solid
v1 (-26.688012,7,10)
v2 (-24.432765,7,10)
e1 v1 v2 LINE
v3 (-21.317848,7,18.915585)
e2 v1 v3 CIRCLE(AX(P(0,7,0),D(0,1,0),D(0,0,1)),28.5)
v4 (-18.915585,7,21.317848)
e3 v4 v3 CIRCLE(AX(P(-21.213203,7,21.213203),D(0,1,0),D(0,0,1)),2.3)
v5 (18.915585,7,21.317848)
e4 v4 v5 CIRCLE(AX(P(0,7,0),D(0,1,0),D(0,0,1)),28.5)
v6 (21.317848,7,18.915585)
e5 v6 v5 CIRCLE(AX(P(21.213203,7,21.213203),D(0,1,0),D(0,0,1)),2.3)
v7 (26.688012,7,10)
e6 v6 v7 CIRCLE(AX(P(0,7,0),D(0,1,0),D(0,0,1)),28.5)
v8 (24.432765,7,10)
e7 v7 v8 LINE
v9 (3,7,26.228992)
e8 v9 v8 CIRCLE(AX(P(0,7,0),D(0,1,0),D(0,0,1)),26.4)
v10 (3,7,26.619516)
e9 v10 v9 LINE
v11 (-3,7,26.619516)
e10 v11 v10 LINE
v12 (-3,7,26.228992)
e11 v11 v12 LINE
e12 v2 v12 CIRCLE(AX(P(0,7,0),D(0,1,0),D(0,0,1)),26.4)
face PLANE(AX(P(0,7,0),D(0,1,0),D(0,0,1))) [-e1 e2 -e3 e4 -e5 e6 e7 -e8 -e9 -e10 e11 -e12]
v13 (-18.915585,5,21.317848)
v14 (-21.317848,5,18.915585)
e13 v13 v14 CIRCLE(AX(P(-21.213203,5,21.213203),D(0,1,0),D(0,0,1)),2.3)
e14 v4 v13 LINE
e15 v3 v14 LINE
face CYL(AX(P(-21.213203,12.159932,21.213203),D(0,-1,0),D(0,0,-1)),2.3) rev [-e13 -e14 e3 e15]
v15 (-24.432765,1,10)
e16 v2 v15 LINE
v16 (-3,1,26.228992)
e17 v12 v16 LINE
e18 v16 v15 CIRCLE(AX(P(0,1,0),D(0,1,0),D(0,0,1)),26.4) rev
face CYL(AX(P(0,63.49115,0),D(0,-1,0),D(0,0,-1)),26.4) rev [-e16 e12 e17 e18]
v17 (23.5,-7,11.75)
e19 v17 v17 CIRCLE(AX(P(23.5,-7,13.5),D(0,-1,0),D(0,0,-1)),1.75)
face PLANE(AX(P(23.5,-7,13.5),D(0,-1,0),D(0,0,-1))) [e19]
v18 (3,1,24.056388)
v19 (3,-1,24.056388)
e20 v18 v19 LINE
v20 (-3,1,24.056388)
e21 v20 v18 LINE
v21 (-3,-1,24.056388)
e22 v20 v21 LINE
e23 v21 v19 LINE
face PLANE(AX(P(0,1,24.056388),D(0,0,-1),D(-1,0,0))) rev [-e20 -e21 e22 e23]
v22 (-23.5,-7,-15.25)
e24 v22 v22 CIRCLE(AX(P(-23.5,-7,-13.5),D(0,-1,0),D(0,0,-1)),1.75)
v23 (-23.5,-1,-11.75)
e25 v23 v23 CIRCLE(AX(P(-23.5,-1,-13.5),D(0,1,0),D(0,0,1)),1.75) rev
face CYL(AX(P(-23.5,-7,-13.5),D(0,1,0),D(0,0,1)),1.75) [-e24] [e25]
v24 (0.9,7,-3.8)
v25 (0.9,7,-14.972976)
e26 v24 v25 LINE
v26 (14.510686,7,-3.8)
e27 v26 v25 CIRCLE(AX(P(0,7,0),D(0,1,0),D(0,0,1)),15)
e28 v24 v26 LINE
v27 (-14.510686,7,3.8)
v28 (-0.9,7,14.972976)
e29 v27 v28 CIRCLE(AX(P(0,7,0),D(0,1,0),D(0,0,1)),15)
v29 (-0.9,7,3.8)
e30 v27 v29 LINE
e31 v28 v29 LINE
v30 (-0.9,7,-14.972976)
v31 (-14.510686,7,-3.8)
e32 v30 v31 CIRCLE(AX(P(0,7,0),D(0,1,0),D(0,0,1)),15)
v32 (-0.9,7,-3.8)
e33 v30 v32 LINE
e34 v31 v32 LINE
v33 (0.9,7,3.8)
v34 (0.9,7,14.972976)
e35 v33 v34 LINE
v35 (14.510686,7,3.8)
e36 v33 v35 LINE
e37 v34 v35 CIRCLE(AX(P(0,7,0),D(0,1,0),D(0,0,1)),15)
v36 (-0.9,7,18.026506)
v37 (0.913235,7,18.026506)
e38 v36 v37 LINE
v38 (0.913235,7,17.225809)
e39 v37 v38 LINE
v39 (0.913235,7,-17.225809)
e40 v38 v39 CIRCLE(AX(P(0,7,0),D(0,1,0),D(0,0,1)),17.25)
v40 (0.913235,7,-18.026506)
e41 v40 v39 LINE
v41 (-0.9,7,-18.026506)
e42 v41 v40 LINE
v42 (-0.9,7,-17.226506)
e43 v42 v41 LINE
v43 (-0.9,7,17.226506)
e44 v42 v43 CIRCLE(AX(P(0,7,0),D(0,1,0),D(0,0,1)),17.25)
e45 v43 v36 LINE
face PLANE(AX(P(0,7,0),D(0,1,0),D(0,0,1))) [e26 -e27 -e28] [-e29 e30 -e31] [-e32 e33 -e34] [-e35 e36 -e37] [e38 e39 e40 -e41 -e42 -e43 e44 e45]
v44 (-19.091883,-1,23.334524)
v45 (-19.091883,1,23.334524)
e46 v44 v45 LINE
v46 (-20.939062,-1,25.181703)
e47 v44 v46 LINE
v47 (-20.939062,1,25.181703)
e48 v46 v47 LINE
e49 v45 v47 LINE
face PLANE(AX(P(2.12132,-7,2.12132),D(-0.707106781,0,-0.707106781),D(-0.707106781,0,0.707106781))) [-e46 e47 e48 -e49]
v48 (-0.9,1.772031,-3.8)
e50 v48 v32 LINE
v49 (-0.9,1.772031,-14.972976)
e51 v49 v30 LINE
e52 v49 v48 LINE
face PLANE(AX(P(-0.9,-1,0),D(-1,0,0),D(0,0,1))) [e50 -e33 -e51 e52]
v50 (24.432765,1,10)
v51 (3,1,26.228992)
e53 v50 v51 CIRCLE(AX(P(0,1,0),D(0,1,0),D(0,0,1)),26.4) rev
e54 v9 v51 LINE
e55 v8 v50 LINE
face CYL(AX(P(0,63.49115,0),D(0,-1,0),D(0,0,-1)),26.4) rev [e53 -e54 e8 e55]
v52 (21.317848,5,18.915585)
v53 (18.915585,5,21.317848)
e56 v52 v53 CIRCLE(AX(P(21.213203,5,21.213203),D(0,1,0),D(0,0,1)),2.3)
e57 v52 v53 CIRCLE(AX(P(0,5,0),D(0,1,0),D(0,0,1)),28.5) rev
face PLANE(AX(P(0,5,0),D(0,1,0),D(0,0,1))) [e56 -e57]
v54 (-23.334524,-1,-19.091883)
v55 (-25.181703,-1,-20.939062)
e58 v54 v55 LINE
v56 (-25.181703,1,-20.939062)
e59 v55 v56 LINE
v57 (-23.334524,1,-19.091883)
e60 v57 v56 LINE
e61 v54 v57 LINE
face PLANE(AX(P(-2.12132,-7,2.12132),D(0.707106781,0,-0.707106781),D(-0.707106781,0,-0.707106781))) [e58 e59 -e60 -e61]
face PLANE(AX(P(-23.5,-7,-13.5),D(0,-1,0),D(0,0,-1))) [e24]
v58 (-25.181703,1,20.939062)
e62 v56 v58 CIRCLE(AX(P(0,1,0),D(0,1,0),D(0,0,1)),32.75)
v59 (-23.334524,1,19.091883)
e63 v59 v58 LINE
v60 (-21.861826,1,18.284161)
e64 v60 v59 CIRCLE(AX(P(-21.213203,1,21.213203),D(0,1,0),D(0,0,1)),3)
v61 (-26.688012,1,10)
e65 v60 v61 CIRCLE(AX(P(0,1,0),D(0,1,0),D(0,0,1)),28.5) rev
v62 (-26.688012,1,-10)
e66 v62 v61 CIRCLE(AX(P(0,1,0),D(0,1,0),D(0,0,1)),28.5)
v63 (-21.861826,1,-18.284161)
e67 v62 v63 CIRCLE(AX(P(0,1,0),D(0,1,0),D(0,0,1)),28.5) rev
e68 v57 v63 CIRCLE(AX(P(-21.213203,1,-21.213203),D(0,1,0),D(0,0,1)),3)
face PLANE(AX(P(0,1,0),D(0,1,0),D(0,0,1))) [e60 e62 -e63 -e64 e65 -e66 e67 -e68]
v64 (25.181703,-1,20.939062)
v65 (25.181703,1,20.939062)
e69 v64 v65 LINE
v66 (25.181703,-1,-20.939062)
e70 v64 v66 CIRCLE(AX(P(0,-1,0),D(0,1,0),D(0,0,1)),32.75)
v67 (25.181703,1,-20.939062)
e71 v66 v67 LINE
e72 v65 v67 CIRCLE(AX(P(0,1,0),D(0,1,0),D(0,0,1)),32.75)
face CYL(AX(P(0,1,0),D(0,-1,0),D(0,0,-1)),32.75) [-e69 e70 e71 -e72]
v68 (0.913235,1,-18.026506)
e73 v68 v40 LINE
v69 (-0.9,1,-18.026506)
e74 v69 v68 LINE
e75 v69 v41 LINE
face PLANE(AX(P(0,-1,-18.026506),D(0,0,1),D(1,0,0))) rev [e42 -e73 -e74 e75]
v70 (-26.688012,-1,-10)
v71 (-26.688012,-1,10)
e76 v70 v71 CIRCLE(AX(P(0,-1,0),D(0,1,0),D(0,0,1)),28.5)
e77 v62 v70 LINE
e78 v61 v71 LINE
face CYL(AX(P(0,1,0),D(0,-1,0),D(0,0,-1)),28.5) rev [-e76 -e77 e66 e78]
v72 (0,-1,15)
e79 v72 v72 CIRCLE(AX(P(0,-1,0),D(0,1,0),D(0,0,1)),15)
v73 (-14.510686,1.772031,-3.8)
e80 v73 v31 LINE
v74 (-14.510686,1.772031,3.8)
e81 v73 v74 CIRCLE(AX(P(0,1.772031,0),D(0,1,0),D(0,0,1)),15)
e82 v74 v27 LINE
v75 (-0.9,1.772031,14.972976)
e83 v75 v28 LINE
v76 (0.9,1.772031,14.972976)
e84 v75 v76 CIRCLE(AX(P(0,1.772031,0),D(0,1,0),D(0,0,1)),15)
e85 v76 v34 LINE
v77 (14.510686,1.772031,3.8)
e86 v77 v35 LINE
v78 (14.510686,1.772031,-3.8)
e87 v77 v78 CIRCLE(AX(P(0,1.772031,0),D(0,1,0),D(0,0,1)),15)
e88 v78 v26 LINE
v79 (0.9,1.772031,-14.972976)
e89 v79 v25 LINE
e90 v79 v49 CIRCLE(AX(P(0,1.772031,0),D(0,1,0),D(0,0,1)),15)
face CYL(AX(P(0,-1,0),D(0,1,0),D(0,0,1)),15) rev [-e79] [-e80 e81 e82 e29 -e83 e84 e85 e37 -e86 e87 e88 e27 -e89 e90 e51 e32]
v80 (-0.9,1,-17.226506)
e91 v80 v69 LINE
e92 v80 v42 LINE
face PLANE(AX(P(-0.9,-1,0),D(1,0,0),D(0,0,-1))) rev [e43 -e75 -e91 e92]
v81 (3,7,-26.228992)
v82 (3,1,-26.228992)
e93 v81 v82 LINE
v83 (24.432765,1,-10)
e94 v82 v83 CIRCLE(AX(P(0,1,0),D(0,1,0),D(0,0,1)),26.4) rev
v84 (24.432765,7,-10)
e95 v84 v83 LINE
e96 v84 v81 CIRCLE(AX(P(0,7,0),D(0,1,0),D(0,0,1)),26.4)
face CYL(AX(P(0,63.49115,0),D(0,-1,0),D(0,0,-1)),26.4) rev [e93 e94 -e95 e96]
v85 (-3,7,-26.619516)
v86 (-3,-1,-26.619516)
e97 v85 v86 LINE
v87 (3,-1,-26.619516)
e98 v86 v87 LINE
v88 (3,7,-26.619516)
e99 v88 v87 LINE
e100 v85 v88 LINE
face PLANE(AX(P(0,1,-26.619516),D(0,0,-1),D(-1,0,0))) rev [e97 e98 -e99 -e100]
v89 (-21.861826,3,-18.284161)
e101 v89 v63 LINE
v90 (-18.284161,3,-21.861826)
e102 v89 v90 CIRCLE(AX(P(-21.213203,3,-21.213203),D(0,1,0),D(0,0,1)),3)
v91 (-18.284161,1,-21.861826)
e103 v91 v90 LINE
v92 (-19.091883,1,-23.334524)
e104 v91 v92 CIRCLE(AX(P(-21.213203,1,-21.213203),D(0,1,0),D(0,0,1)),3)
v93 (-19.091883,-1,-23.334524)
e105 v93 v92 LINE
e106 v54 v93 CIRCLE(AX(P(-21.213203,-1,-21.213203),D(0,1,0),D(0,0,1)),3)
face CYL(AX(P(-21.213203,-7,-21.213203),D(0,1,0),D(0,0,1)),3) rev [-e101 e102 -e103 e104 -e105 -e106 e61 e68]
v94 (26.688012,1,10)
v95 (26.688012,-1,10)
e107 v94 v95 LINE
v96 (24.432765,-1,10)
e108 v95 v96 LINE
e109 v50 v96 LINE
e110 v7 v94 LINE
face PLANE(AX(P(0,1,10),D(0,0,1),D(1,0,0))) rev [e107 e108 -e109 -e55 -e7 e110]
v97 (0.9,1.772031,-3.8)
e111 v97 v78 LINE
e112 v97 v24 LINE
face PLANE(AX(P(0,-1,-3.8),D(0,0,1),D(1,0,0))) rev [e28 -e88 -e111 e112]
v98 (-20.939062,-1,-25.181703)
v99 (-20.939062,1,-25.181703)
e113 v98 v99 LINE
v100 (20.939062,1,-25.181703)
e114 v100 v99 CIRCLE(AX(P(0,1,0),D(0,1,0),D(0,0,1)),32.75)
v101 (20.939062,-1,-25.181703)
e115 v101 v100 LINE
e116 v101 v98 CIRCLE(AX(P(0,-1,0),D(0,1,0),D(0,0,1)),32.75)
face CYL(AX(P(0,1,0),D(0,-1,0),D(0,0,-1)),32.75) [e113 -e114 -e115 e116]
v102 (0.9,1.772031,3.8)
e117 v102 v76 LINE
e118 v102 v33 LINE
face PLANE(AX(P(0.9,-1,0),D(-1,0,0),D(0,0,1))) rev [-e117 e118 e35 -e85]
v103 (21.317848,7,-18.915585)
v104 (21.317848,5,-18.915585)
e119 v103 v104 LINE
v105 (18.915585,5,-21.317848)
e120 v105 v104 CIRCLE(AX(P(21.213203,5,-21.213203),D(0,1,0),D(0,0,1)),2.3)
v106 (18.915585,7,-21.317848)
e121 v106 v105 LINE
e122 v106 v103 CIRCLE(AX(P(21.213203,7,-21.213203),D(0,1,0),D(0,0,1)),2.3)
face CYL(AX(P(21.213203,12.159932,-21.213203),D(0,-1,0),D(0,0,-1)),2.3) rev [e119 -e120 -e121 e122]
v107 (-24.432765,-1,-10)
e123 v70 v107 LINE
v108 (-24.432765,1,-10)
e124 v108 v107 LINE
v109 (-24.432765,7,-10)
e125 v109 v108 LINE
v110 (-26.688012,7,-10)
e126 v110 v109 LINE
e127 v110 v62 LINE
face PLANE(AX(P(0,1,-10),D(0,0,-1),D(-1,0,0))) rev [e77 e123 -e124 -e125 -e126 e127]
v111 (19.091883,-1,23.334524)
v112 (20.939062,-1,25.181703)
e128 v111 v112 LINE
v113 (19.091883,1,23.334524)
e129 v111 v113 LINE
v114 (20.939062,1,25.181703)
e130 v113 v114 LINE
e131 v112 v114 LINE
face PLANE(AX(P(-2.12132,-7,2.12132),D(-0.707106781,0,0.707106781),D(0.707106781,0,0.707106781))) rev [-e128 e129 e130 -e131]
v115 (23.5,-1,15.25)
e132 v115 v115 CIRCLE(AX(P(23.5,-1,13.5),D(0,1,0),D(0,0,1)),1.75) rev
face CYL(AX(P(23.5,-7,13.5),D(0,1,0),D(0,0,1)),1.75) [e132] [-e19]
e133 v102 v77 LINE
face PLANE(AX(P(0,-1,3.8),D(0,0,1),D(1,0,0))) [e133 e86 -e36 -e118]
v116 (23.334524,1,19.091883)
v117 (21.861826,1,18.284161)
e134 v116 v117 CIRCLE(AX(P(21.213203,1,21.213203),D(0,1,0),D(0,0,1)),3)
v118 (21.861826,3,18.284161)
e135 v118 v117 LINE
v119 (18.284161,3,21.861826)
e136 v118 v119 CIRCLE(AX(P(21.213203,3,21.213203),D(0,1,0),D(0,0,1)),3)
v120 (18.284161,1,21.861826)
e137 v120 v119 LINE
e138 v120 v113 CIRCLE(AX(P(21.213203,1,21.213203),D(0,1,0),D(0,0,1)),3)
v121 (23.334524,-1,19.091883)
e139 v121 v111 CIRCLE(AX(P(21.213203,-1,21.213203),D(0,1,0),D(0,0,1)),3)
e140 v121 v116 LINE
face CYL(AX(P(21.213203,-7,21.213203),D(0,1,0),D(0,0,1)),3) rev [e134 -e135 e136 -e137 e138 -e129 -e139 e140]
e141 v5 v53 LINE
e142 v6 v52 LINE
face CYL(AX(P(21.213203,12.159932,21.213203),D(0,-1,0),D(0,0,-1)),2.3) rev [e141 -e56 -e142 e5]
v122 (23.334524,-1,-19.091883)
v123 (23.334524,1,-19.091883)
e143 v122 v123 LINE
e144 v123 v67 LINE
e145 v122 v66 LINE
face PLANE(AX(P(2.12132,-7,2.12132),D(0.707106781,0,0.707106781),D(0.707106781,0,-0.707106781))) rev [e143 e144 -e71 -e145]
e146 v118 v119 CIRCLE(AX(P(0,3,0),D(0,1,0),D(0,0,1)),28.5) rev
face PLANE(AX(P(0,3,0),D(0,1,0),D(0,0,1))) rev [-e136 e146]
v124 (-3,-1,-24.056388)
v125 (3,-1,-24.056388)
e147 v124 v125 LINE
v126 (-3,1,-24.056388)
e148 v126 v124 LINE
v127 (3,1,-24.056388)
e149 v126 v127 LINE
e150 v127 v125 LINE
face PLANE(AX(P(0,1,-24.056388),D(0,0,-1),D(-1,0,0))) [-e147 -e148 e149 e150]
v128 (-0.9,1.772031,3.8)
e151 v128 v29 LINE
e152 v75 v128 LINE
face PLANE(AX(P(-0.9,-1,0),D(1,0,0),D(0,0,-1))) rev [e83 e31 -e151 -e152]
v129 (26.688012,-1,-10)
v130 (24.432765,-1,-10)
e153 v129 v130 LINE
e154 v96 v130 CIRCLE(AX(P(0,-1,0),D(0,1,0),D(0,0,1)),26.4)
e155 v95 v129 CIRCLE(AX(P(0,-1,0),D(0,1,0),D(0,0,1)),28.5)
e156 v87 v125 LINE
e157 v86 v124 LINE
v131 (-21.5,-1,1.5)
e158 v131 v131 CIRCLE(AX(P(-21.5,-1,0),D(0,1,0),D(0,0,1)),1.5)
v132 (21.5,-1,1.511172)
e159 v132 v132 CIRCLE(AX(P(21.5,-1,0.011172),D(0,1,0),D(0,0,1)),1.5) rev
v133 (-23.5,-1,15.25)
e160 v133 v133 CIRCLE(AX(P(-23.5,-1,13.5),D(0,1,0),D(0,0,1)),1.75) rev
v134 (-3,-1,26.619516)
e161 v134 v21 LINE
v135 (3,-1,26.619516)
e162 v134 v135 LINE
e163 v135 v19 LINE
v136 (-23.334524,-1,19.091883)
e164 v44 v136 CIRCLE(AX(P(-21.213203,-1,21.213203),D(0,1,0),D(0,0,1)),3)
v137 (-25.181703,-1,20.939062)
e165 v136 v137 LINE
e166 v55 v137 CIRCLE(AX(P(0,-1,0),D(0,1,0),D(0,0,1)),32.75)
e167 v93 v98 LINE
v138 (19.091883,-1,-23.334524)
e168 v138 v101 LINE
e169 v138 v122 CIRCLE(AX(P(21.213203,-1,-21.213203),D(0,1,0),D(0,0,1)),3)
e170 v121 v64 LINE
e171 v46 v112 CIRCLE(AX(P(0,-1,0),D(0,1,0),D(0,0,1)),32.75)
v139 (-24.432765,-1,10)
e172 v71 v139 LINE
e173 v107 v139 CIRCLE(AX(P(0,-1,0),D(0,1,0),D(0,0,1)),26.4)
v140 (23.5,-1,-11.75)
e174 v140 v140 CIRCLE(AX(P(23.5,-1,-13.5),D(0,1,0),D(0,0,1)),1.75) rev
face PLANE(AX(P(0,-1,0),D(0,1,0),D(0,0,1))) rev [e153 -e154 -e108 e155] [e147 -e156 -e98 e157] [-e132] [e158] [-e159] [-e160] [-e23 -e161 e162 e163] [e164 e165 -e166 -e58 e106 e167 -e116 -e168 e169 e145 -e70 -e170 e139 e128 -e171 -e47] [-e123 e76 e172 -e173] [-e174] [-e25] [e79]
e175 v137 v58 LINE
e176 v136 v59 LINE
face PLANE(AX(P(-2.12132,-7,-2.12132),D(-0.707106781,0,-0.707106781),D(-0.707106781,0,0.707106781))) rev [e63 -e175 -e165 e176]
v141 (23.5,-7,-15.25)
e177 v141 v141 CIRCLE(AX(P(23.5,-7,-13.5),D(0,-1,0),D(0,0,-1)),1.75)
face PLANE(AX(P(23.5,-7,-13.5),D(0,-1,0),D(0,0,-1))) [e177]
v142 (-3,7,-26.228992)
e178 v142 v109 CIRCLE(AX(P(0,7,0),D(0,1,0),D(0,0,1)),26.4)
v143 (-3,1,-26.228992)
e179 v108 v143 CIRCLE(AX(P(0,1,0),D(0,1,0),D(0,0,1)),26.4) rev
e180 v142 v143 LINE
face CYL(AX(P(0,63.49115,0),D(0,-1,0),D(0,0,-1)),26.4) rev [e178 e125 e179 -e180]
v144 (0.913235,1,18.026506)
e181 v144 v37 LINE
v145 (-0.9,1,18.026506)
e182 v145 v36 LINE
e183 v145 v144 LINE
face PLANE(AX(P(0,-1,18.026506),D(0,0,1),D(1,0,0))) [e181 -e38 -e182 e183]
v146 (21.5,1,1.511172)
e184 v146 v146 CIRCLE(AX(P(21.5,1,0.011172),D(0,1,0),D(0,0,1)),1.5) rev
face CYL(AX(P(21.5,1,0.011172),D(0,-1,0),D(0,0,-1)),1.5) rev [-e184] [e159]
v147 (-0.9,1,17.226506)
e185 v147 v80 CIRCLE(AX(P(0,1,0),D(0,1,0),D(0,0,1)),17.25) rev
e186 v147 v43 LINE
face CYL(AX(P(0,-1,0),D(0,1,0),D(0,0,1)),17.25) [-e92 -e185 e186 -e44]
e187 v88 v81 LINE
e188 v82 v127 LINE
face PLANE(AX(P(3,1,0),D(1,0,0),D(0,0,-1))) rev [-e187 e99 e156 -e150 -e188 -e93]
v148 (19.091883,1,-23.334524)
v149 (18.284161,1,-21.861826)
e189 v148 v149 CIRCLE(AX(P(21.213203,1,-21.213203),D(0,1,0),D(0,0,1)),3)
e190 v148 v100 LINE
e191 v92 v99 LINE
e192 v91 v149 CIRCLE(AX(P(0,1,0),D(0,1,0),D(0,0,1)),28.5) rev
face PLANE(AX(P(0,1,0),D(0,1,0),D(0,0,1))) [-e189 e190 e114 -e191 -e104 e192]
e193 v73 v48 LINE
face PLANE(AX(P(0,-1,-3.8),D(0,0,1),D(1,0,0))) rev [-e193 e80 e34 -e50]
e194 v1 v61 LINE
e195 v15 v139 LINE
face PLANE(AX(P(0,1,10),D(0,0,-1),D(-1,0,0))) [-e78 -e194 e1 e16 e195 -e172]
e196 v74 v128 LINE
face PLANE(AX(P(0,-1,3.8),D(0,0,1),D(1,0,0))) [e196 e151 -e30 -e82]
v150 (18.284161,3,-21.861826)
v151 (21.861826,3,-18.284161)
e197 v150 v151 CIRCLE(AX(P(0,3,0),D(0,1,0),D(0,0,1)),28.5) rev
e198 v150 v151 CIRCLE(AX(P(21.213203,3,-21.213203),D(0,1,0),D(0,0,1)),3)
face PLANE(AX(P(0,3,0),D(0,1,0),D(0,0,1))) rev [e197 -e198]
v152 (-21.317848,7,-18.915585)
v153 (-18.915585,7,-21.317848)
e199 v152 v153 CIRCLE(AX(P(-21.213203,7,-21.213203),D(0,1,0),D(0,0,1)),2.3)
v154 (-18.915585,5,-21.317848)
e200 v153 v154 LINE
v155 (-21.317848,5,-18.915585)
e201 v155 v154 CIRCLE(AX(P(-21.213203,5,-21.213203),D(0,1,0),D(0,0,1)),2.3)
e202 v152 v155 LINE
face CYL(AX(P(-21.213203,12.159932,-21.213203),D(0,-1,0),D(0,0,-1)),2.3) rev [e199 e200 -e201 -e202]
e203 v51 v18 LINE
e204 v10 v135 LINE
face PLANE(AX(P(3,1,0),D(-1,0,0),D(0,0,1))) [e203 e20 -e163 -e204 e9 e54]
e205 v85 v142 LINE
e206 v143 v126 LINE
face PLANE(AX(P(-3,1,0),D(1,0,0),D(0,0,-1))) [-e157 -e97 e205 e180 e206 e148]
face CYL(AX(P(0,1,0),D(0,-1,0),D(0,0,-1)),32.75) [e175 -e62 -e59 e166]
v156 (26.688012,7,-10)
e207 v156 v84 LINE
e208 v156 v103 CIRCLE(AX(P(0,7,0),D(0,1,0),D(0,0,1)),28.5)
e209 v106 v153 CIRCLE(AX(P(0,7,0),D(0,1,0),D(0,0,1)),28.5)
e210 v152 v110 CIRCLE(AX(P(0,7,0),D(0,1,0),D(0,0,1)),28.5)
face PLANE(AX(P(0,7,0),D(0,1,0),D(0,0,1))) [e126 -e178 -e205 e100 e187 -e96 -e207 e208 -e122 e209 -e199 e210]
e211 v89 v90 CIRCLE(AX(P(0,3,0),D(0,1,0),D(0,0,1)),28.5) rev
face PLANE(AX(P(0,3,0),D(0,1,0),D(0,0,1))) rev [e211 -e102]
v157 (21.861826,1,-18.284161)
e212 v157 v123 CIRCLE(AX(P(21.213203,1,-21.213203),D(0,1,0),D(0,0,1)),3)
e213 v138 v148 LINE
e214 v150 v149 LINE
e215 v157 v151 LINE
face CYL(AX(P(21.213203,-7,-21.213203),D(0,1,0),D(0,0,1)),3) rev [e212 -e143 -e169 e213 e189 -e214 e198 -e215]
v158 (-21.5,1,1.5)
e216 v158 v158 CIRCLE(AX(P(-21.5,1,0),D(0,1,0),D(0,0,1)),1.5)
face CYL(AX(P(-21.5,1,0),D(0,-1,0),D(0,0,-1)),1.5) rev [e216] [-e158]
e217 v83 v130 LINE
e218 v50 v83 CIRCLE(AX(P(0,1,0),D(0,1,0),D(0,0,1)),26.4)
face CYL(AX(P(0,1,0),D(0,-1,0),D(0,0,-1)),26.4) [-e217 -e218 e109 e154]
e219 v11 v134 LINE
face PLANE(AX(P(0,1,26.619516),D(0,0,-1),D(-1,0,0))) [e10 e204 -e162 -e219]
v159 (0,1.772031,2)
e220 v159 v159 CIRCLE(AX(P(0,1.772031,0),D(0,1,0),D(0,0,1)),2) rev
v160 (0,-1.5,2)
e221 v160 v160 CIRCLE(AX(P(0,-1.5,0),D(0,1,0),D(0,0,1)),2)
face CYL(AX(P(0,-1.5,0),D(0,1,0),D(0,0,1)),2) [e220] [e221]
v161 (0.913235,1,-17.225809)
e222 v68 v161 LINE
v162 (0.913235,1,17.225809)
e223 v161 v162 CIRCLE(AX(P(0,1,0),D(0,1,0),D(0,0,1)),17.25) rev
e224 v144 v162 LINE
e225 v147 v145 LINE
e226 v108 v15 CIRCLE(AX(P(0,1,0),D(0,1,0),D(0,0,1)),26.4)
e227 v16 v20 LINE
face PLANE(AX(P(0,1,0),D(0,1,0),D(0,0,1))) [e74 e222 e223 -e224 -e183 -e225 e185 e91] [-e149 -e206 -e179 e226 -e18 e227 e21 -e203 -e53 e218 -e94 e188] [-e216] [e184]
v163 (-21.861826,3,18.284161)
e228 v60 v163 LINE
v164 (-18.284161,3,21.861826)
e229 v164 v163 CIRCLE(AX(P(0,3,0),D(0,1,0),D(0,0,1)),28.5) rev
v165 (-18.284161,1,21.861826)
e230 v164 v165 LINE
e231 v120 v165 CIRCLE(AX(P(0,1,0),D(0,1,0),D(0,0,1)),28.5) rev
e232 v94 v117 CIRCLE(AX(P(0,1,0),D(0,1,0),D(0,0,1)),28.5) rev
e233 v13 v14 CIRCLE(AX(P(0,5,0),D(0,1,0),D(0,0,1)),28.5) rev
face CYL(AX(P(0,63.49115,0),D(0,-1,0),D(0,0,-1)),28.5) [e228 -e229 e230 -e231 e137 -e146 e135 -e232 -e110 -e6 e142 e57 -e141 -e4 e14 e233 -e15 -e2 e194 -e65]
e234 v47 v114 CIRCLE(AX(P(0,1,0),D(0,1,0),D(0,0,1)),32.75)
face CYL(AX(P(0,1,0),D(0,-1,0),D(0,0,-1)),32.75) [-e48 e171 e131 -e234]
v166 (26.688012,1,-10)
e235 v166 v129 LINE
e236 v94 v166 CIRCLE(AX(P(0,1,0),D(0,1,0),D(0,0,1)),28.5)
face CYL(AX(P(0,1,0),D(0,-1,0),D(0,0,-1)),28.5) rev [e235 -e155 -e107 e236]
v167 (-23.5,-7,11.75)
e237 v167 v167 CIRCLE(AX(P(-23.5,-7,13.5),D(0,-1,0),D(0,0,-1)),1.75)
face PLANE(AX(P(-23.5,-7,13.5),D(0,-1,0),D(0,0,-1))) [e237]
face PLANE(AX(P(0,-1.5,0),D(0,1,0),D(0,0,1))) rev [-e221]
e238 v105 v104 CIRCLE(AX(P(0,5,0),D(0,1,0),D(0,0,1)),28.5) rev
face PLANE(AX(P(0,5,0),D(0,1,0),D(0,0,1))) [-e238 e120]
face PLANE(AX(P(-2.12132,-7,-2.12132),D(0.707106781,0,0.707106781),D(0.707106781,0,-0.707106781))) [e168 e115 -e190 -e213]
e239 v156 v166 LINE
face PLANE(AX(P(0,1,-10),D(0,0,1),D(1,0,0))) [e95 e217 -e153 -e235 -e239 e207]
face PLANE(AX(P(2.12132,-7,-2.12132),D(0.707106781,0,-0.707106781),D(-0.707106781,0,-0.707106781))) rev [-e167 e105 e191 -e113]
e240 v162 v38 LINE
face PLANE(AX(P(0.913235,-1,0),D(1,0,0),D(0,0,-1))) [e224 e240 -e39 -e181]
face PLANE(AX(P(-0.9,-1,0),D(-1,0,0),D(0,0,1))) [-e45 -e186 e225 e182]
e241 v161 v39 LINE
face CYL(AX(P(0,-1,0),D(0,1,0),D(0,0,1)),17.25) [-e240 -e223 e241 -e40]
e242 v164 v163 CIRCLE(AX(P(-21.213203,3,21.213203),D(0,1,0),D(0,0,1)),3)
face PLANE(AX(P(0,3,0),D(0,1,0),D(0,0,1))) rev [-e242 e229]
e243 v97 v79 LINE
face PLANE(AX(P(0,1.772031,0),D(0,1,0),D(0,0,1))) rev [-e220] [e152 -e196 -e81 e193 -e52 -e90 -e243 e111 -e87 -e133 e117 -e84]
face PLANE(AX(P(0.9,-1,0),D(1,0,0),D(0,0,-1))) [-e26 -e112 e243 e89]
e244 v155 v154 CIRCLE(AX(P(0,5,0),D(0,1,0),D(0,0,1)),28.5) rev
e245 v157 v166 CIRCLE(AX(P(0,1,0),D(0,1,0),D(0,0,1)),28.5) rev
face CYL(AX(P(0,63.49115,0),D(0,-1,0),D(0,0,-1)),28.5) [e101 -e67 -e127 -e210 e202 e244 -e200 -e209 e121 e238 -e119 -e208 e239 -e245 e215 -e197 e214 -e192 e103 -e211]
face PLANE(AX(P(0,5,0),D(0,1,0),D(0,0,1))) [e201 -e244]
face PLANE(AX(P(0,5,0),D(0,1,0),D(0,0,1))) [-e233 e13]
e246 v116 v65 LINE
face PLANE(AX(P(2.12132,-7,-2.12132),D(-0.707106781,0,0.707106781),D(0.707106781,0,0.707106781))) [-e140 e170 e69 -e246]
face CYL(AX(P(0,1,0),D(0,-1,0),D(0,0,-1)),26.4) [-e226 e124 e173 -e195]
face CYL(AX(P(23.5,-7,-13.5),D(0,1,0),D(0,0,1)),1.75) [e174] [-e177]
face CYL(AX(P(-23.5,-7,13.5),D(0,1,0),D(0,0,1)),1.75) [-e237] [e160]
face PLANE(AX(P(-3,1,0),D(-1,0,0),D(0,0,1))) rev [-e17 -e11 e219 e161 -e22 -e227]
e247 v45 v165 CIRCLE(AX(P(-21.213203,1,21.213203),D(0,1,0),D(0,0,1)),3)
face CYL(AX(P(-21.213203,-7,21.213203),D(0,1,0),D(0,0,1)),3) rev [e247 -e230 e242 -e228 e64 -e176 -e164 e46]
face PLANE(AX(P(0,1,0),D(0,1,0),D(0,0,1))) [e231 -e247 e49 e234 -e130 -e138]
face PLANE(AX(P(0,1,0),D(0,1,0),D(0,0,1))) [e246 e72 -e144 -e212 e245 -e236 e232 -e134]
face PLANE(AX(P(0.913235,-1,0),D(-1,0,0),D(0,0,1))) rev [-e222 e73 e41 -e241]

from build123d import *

# Parameters (mm, degrees)
CENTER_SPOKE_EXTRUDE_DEPTH      = 7
CENTER_SPOKE_EXTRUDE_DEPTH_BACK = 1
SKETCH1_R                       = 17.25
SKETCH1_R_2                     = 15
BASE_DEPTH                      = 1
BASE_DEPTH_BACK                 = 1
SKETCH1_4_R                     = 32.75
SKETCH1_4_W                     = 6
SKETCH1_4_H                     = 2.563127927
SKETCH1_4_R_2                   = 1.5
SKETCH3_R                       = 1.75
SPRING_FEET_DEPTH               = 6
CUT_EXTRUDE1_DEPTH              = 1.772030918
CUT_EXTRUDE1_DEPTH_BACK         = 2
SKETCH1_8_R                     = 2
BOSS_EXTRUDE3_START             = -1.5
SKETCH1_11_R                    = 2
BOSS_EXTRUDE3_DEPTH             = 8.5
BOSS_EXTRUDE4_DEPTH             = 7
CUT_EXTRUDE3_DEPTH              = 48.001329768
CUT_EXTRUDE3_DEPTH_BACK         = 48.001329768
BOSS_EXTRUDE5_START             = 2
BOSS_EXTRUDE5_DEPTH             = 4
BOSS_EXTRUDE6_START             = 2
BOSS_EXTRUDE6_DEPTH             = 2


# Read off the part's stored shape, not the designer's step: Boss-Extrude5
with BuildPart() as part:
    # Sketch1 → Center Spoke Extrude (new, two sides: drawn at the far end of the back side and taken through both)
    # profile 1 of 9: a face of its own
    with BuildSketch(Plane(origin=(0, 0, 0), x_dir=(1, 0, 0), z_dir=(0, 1, 0)).offset(-CENTER_SPOKE_EXTRUDE_DEPTH_BACK)):
        Circle(SKETCH1_R)
        Circle(SKETCH1_R_2, mode=Mode.SUBTRACT)
    # profile 2 of 9: a face of its own
    with BuildSketch(Plane(origin=(0, 0, 0), x_dir=(1, 0, 0), z_dir=(0, 1, 0)).offset(-CENTER_SPOKE_EXTRUDE_DEPTH_BACK)):
        with BuildLine():
            Line((-0.9, 14.972975656), (-0.9, 3.8))
            Line((-0.9, 3.8), (0.9, 3.8))
            Line((0.9, 3.8), (0.9, 14.972975656))
            ThreePointArc((0.9, 14.972975656), (0, 15), (-0.9, 14.972975656))
        make_face()
    # profile 3 of 9: a face of its own
    with BuildSketch(Plane(origin=(0, 0, 0), x_dir=(1, 0, 0), z_dir=(0, 1, 0)).offset(-CENTER_SPOKE_EXTRUDE_DEPTH_BACK)):
        with BuildLine():
            Line((0.9, 3.8), (-0.9, 3.8))
            Line((-0.9, 3.8), (-0.9, 1.78605711))
            ThreePointArc((-0.9, 1.78605711), (0, 2), (0.9, 1.78605711))
            Line((0.9, 1.78605711), (0.9, 3.8))
        make_face()
    # profile 4 of 9: a face of its own
    with BuildSketch(Plane(origin=(0, 0, 0), x_dir=(1, 0, 0), z_dir=(0, 1, 0)).offset(-CENTER_SPOKE_EXTRUDE_DEPTH_BACK)):
        with BuildLine():
            Line((-0.9, -1.78605711), (-0.9, -3.8))
            Line((-0.9, -3.8), (0.9, -3.8))
            Line((0.9, -3.8), (0.9, -1.78605711))
            ThreePointArc((0.9, -1.78605711), (0, -2), (-0.9, -1.78605711))
        make_face()
    # profile 5 of 9: a face of its own
    with BuildSketch(Plane(origin=(0, 0, 0), x_dir=(1, 0, 0), z_dir=(0, 1, 0)).offset(-CENTER_SPOKE_EXTRUDE_DEPTH_BACK)):
        with BuildLine():
            Line((0.9, -3.8), (-0.9, -3.8))
            Line((-0.9, -3.8), (-0.9, -14.972975656))
            ThreePointArc((-0.9, -14.972975656), (0, -15), (0.9, -14.972975656))
            Line((0.9, -14.972975656), (0.9, -3.8))
        make_face()
    # profile 6 of 9: a face of its own
    with BuildSketch(Plane(origin=(0, 0, 0), x_dir=(1, 0, 0), z_dir=(0, 1, 0)).offset(-CENTER_SPOKE_EXTRUDE_DEPTH_BACK)):
        with BuildLine():
            Line((14.510685718, 3.8), (0.9, 3.8))
            Line((0.9, 3.8), (0.9, 1.78605711))
            ThreePointArc((0.9, 1.78605711), (1.702938637, 1.048808848), (2, 0))
            ThreePointArc((2, 0), (1.702938637, -1.048808848), (0.9, -1.78605711))
            Line((0.9, -1.78605711), (0.9, -3.8))
            Line((0.9, -3.8), (14.510685718, -3.8))
            ThreePointArc((14.510685718, -3.8), (14.87716851, -1.915687113), (15, 0))
            ThreePointArc((15, 0), (14.87716851, 1.915687113), (14.510685718, 3.8))
        make_face()
    # profile 7 of 9: a face of its own
    with BuildSketch(Plane(origin=(0, 0, 0), x_dir=(1, 0, 0), z_dir=(0, 1, 0)).offset(-CENTER_SPOKE_EXTRUDE_DEPTH_BACK)):
        with BuildLine():
            Line((-0.9, 3.8), (-14.510685718, 3.8))
            ThreePointArc((-14.510685718, 3.8), (-15, 0), (-14.510685718, -3.8))
            Line((-14.510685718, -3.8), (-0.9, -3.8))
            Line((-0.9, -3.8), (-0.9, -1.78605711))
            ThreePointArc((-0.9, -1.78605711), (-2, 0), (-0.9, 1.78605711))
            Line((-0.9, 1.78605711), (-0.9, 3.8))
        make_face()
    # profile 8 of 9: a face of its own
    with BuildSketch(Plane(origin=(0, 0, 0), x_dir=(1, 0, 0), z_dir=(0, 1, 0)).offset(-CENTER_SPOKE_EXTRUDE_DEPTH_BACK)):
        with BuildLine():
            ThreePointArc((0.913235294, -17.225809162), (0.006626806, -17.249998727), (-0.9, -17.22650574))
            Line((-0.9, -17.22650574), (-0.9, -18.02650574))
            Line((-0.9, -18.02650574), (0.913235294, -18.02650574))
            Line((0.913235294, -18.02650574), (0.913235294, -17.225809162))
        make_face()
    # profile 9 of 9: a face of its own
    with BuildSketch(Plane(origin=(0, 0, 0), x_dir=(1, 0, 0), z_dir=(0, 1, 0)).offset(-CENTER_SPOKE_EXTRUDE_DEPTH_BACK)):
        with BuildLine():
            Line((-0.9, 18.02650574), (-0.9, 17.22650574))
            ThreePointArc((-0.9, 17.22650574), (0.006626806, 17.249998727), (0.913235294, 17.225809162))
            Line((0.913235294, 17.225809162), (0.913235294, 18.02650574))
            Line((0.913235294, 18.02650574), (-0.9, 18.02650574))
        make_face()
    extrude(amount=CENTER_SPOKE_EXTRUDE_DEPTH + CENTER_SPOKE_EXTRUDE_DEPTH_BACK)

    # Sketch1<4> → base (add, two sides: drawn at the far end of the back side and taken through both)
    with BuildSketch(Plane(origin=(0, 0, 0), x_dir=(1, 0, 0), z_dir=(0, 1, 0)).offset(-BASE_DEPTH_BACK)):
        with Locations(Location((0, 0, 0), (0, 0, 270))):
            Circle(SKETCH1_4_R)
        with Locations((0, -25.337952307)):
            Rectangle(SKETCH1_4_W, SKETCH1_4_H, mode=Mode.SUBTRACT)
        with BuildLine():
            ThreePointArc((-26.68801229, -10), (-28.5, 0), (-26.68801229, 10))
            Line((-26.68801229, 10), (-24.432764887, 10))
            ThreePointArc((-24.432764887, 10), (-26.4, 0), (-24.432764887, -10))
            Line((-24.432764887, -10), (-26.68801229, -10))
        make_face(mode=Mode.SUBTRACT)
        with Locations(Location((21.5, -0.011171984, 0), (0, 0, 270))):
            Circle(SKETCH1_4_R_2, mode=Mode.SUBTRACT)
        with Locations(Location((-21.5, 0, 0), (0, 0, 270))):
            Circle(SKETCH1_4_R_2, mode=Mode.SUBTRACT)
        with Locations((0, 25.337952307)):
            Rectangle(SKETCH1_4_W, SKETCH1_4_H, mode=Mode.SUBTRACT)
        with BuildLine():
            ThreePointArc((-0.9, -17.22650574), (-17.25, 0), (-0.9, 17.22650574))
            Line((-0.9, 17.22650574), (-0.9, 18.02650574))
            Line((-0.9, 18.02650574), (0.913235294, 18.02650574))
            Line((0.913235294, 18.02650574), (0.913235294, 17.225809162))
            ThreePointArc((0.913235294, 17.225809162), (17.25, 0), (0.913235294, -17.225809162))
            Line((0.913235294, -17.225809162), (0.913235294, -18.02650574))
            Line((0.913235294, -18.02650574), (-0.9, -18.02650574))
            Line((-0.9, -18.02650574), (-0.9, -17.22650574))
        make_face(mode=Mode.SUBTRACT)
        with BuildLine():
            ThreePointArc((26.68801229, 10), (28.5, 0), (26.68801229, -10))
            Line((26.68801229, -10), (24.432764887, -10))
            ThreePointArc((24.432764887, -10), (26.4, 0), (24.432764887, 10))
            Line((24.432764887, 10), (26.68801229, 10))
        make_face(mode=Mode.SUBTRACT)
    extrude(amount=BASE_DEPTH + BASE_DEPTH_BACK)

    # Sketch3 → Spring feet (add)
    with BuildSketch(Plane.XZ.offset(1)):
        with Locations(Location((-23.5, 13.5, 0), (0, 0, 90))):
            Circle(SKETCH3_R)
        with Locations(Location((23.5, 13.5, 0), (0, 0, 90))):
            Circle(SKETCH3_R)
        with Locations(Location((23.5, -13.5, 0), (0, 0, 90))):
            Circle(SKETCH3_R)
        with Locations(Location((-23.5, -13.5, 0), (0, 0, 90))):
            Circle(SKETCH3_R)
    extrude(amount=SPRING_FEET_DEPTH)

    # Sketch1<8> → Cut-Extrude1 (cut, two sides: drawn at the far end of the back side and taken through both)
    with BuildSketch(Plane(origin=(0, 0, 0), x_dir=(1, 0, 0), z_dir=(0, 1, 0)).offset(-CUT_EXTRUDE1_DEPTH_BACK)):
        with BuildLine():
            Line((14.510685718, 3.8), (0.9, 3.8))
            Line((0.9, 3.8), (0.9, 1.78605711))
            ThreePointArc((0.9, 1.78605711), (1.702938637, 1.048808848), (2, 0))
            ThreePointArc((2, 0), (1.702938637, -1.048808848), (0.9, -1.78605711))
            Line((0.9, -1.78605711), (0.9, -3.8))
            Line((0.9, -3.8), (14.510685718, -3.8))
            ThreePointArc((14.510685718, -3.8), (14.87716851, -1.915687113), (15, 0))
            ThreePointArc((15, 0), (14.87716851, 1.915687113), (14.510685718, 3.8))
        make_face()
        with BuildLine():
            Line((-0.9, 3.8), (-14.510685718, 3.8))
            ThreePointArc((-14.510685718, 3.8), (-15, 0), (-14.510685718, -3.8))
            Line((-14.510685718, -3.8), (-0.9, -3.8))
            Line((-0.9, -3.8), (-0.9, -1.78605711))
            ThreePointArc((-0.9, -1.78605711), (-2, 0), (-0.9, 1.78605711))
            Line((-0.9, 1.78605711), (-0.9, 3.8))
        make_face()
        with BuildLine():
            Line((-0.9, 14.972975656), (-0.9, 3.8))
            Line((-0.9, 3.8), (0.9, 3.8))
            Line((0.9, 3.8), (0.9, 14.972975656))
            ThreePointArc((0.9, 14.972975656), (0, 15), (-0.9, 14.972975656))
        make_face()
        with BuildLine():
            Line((-0.9, -1.78605711), (-0.9, -3.8))
            Line((-0.9, -3.8), (0.9, -3.8))
            Line((0.9, -3.8), (0.9, -1.78605711))
            ThreePointArc((0.9, -1.78605711), (0, -2), (-0.9, -1.78605711))
        make_face()
        with BuildLine():
            Line((0.9, -3.8), (-0.9, -3.8))
            Line((-0.9, -3.8), (-0.9, -14.972975656))
            ThreePointArc((-0.9, -14.972975656), (0, -15), (0.9, -14.972975656))
            Line((0.9, -14.972975656), (0.9, -3.8))
        make_face()
        with Locations(Location((0, 0, 0), (0, 0, 270))):
            Circle(SKETCH1_8_R)
        with BuildLine():
            Line((0.9, 3.8), (-0.9, 3.8))
            Line((-0.9, 3.8), (-0.9, 1.78605711))
            ThreePointArc((-0.9, 1.78605711), (0, 2), (0.9, 1.78605711))
            Line((0.9, 1.78605711), (0.9, 3.8))
        make_face()
    extrude(amount=CUT_EXTRUDE1_DEPTH + CUT_EXTRUDE1_DEPTH_BACK, mode=Mode.SUBTRACT)

    # Sketch1<11> → Boss-Extrude3 (add)
    with BuildSketch(Plane(origin=(0, 0, 0), x_dir=(1, 0, 0), z_dir=(0, 1, 0)).offset(BOSS_EXTRUDE3_START)):
        with Locations(Location((0, 0, 0), (0, 0, 270))):
            Circle(SKETCH1_11_R)
    extrude(amount=BOSS_EXTRUDE3_DEPTH)

    # Sketch1<12> → Boss-Extrude4 (add)
    with BuildSketch(Plane(origin=(0, 0, 0), x_dir=(1, 0, 0), z_dir=(0, 1, 0))):
        with BuildLine():
            ThreePointArc((-24.432764887, 10), (-15.936881419, 21.046990536), (-3, 26.228991593))
            Line((-3, 26.228991593), (-3, 26.61951627))
            Line((-3, 26.61951627), (3, 26.61951627))
            Line((3, 26.61951627), (3, 26.228991593))
            ThreePointArc((3, 26.228991593), (15.936881419, 21.046990536), (24.432764887, 10))
            Line((24.432764887, 10), (26.68801229, 10))
            ThreePointArc((26.68801229, 10), (0, 28.5), (-26.68801229, 10))
            Line((-26.68801229, 10), (-24.432764887, 10))
        make_face()
        with BuildLine():
            ThreePointArc((-3, -26.228991593), (-15.936881419, -21.046990536), (-24.432764887, -10))
            Line((-24.432764887, -10), (-26.68801229, -10))
            ThreePointArc((-26.68801229, -10), (0, -28.5), (26.68801229, -10))
            Line((26.68801229, -10), (24.432764887, -10))
            ThreePointArc((24.432764887, -10), (15.936881419, -21.046990536), (3, -26.228991593))
            Line((3, -26.228991593), (3, -26.61951627))
            Line((3, -26.61951627), (-3, -26.61951627))
            Line((-3, -26.61951627), (-3, -26.228991593))
        make_face()
    extrude(amount=BOSS_EXTRUDE4_DEPTH)

    # Sketch4 → Cut-Extrude3 (cut, two sides: drawn at the far end of the back side and taken through both)
    with BuildSketch(Plane(origin=(0, 1, 0), x_dir=(1, 0, 0), z_dir=(0, 1, 0)).offset(-CUT_EXTRUDE3_DEPTH_BACK)):
        with BuildLine():
            ThreePointArc((-20.939062351, 25.181703038), (-23.157747084, 23.157747084), (-25.181703038, 20.939062351))
            Line((-25.181703038, 20.939062351), (-23.334523779, 19.091883092))
            ThreePointArc((-23.334523779, 19.091883092), (-19.091883092, 19.091883092), (-19.091883092, 23.334523779))
            Line((-19.091883092, 23.334523779), (-20.939062351, 25.181703038))
        make_face()
        with BuildLine():
            Line((20.939062351, 25.181703038), (19.091883092, 23.334523779))
            ThreePointArc((19.091883092, 23.334523779), (19.091883092, 19.091883092), (23.334523779, 19.091883092))
            Line((23.334523779, 19.091883092), (25.181703038, 20.939062351))
            ThreePointArc((25.181703038, 20.939062351), (23.157747084, 23.157747084), (20.939062351, 25.181703038))
        make_face()
        with BuildLine():
            Line((-23.334523779, -19.091883092), (-25.181703038, -20.939062351))
            ThreePointArc((-25.181703038, -20.939062351), (-23.157747084, -23.157747084), (-20.939062351, -25.181703038))
            Line((-20.939062351, -25.181703038), (-19.091883092, -23.334523779))
            ThreePointArc((-19.091883092, -23.334523779), (-19.091883092, -19.091883092), (-23.334523779, -19.091883092))
        make_face()
        with BuildLine():
            Line((25.181703038, -20.939062351), (23.334523779, -19.091883092))
            ThreePointArc((23.334523779, -19.091883092), (19.091883092, -19.091883092), (19.091883092, -23.334523779))
            Line((19.091883092, -23.334523779), (20.939062351, -25.181703038))
            ThreePointArc((20.939062351, -25.181703038), (23.157747084, -23.157747084), (25.181703038, -20.939062351))
        make_face()
    extrude(amount=CUT_EXTRUDE3_DEPTH + CUT_EXTRUDE3_DEPTH_BACK, mode=Mode.SUBTRACT)

    # Boss-Extrude5 outline → Boss-Extrude5 (add)
    with BuildSketch(Plane(origin=(0, 1, 0), x_dir=(1, 0, 0), z_dir=(0, 1, 0)).offset(BOSS_EXTRUDE5_START)):
        with BuildLine():
            ThreePointArc((18.284161206, -21.861826296), (18.601861771, -21.5921453), (18.915585202, -21.317847839))
            ThreePointArc((18.915585202, -21.317847839), (19.586857839, -19.586857839), (21.317847839, -18.915585202))
            ThreePointArc((21.317847839, -18.915585202), (21.5921453, -18.601861771), (21.861826296, -18.284161206))
            ThreePointArc((21.861826296, -18.284161206), (19.091883092, -19.091883092), (18.284161206, -21.861826296))
        make_face()
        with BuildLine():
            ThreePointArc((-18.915585202, -21.317847839), (-18.601861771, -21.5921453), (-18.284161206, -21.861826296))
            ThreePointArc((-18.284161206, -21.861826296), (-19.091883092, -19.091883092), (-21.861826296, -18.284161206))
            ThreePointArc((-21.861826296, -18.284161206), (-21.5921453, -18.601861771), (-21.317847839, -18.915585202))
            ThreePointArc((-21.317847839, -18.915585202), (-19.586857839, -19.586857839), (-18.915585202, -21.317847839))
        make_face()
        with BuildLine():
            ThreePointArc((-18.284161206, 21.861826296), (-18.601861771, 21.5921453), (-18.915585202, 21.317847839))
            ThreePointArc((-18.915585202, 21.317847839), (-19.586857839, 19.586857839), (-21.317847839, 18.915585202))
            ThreePointArc((-21.317847839, 18.915585202), (-21.5921453, 18.601861771), (-21.861826296, 18.284161206))
            ThreePointArc((-21.861826296, 18.284161206), (-19.091883092, 19.091883092), (-18.284161206, 21.861826296))
        make_face()
        with BuildLine():
            ThreePointArc((18.915585202, 21.317847839), (18.601861771, 21.5921453), (18.284161206, 21.861826296))
            ThreePointArc((18.284161206, 21.861826296), (19.091883092, 19.091883092), (21.861826296, 18.284161206))
            ThreePointArc((21.861826296, 18.284161206), (21.5921453, 18.601861771), (21.317847839, 18.915585202))
            ThreePointArc((21.317847839, 18.915585202), (19.586857839, 19.586857839), (18.915585202, 21.317847839))
        make_face()
    extrude(amount=BOSS_EXTRUDE5_DEPTH)

    # Sketch4<4> → Boss-Extrude6 (add)
    with BuildSketch(Plane(origin=(0, 1, 0), x_dir=(1, 0, 0), z_dir=(0, 1, 0)).offset(BOSS_EXTRUDE6_START)):
        with BuildLine():
            ThreePointArc((-18.913203436, 21.213203436), (-18.913798954, 21.265539188), (-18.915585202, 21.317847839))
            ThreePointArc((-18.915585202, 21.317847839), (-20.152543264, 20.152543264), (-21.317847839, 18.915585202))
            ThreePointArc((-21.317847839, 18.915585202), (-19.6242859, 19.550271969), (-18.913203436, 21.213203436))
        make_face()
        with BuildLine():
            ThreePointArc((21.317847839, 18.915585202), (20.152543264, 20.152543264), (18.915585202, 21.317847839))
            ThreePointArc((18.915585202, 21.317847839), (19.586857839, 19.586857839), (21.317847839, 18.915585202))
        make_face()
        with BuildLine():
            ThreePointArc((18.915585202, -21.317847839), (20.152543264, -20.152543264), (21.317847839, -18.915585202))
            ThreePointArc((21.317847839, -18.915585202), (19.586857839, -19.586857839), (18.915585202, -21.317847839))
        make_face()
        with BuildLine():
            ThreePointArc((-21.317847839, -18.915585202), (-20.152543264, -20.152543264), (-18.915585202, -21.317847839))
            ThreePointArc((-18.915585202, -21.317847839), (-18.913798954, -21.265539188), (-18.913203436, -21.213203436))
            ThreePointArc((-18.913203436, -21.213203436), (-19.6242859, -19.550271969), (-21.317847839, -18.915585202))
        make_face()
    extrude(amount=BOSS_EXTRUDE6_DEPTH)


solid = part.part
